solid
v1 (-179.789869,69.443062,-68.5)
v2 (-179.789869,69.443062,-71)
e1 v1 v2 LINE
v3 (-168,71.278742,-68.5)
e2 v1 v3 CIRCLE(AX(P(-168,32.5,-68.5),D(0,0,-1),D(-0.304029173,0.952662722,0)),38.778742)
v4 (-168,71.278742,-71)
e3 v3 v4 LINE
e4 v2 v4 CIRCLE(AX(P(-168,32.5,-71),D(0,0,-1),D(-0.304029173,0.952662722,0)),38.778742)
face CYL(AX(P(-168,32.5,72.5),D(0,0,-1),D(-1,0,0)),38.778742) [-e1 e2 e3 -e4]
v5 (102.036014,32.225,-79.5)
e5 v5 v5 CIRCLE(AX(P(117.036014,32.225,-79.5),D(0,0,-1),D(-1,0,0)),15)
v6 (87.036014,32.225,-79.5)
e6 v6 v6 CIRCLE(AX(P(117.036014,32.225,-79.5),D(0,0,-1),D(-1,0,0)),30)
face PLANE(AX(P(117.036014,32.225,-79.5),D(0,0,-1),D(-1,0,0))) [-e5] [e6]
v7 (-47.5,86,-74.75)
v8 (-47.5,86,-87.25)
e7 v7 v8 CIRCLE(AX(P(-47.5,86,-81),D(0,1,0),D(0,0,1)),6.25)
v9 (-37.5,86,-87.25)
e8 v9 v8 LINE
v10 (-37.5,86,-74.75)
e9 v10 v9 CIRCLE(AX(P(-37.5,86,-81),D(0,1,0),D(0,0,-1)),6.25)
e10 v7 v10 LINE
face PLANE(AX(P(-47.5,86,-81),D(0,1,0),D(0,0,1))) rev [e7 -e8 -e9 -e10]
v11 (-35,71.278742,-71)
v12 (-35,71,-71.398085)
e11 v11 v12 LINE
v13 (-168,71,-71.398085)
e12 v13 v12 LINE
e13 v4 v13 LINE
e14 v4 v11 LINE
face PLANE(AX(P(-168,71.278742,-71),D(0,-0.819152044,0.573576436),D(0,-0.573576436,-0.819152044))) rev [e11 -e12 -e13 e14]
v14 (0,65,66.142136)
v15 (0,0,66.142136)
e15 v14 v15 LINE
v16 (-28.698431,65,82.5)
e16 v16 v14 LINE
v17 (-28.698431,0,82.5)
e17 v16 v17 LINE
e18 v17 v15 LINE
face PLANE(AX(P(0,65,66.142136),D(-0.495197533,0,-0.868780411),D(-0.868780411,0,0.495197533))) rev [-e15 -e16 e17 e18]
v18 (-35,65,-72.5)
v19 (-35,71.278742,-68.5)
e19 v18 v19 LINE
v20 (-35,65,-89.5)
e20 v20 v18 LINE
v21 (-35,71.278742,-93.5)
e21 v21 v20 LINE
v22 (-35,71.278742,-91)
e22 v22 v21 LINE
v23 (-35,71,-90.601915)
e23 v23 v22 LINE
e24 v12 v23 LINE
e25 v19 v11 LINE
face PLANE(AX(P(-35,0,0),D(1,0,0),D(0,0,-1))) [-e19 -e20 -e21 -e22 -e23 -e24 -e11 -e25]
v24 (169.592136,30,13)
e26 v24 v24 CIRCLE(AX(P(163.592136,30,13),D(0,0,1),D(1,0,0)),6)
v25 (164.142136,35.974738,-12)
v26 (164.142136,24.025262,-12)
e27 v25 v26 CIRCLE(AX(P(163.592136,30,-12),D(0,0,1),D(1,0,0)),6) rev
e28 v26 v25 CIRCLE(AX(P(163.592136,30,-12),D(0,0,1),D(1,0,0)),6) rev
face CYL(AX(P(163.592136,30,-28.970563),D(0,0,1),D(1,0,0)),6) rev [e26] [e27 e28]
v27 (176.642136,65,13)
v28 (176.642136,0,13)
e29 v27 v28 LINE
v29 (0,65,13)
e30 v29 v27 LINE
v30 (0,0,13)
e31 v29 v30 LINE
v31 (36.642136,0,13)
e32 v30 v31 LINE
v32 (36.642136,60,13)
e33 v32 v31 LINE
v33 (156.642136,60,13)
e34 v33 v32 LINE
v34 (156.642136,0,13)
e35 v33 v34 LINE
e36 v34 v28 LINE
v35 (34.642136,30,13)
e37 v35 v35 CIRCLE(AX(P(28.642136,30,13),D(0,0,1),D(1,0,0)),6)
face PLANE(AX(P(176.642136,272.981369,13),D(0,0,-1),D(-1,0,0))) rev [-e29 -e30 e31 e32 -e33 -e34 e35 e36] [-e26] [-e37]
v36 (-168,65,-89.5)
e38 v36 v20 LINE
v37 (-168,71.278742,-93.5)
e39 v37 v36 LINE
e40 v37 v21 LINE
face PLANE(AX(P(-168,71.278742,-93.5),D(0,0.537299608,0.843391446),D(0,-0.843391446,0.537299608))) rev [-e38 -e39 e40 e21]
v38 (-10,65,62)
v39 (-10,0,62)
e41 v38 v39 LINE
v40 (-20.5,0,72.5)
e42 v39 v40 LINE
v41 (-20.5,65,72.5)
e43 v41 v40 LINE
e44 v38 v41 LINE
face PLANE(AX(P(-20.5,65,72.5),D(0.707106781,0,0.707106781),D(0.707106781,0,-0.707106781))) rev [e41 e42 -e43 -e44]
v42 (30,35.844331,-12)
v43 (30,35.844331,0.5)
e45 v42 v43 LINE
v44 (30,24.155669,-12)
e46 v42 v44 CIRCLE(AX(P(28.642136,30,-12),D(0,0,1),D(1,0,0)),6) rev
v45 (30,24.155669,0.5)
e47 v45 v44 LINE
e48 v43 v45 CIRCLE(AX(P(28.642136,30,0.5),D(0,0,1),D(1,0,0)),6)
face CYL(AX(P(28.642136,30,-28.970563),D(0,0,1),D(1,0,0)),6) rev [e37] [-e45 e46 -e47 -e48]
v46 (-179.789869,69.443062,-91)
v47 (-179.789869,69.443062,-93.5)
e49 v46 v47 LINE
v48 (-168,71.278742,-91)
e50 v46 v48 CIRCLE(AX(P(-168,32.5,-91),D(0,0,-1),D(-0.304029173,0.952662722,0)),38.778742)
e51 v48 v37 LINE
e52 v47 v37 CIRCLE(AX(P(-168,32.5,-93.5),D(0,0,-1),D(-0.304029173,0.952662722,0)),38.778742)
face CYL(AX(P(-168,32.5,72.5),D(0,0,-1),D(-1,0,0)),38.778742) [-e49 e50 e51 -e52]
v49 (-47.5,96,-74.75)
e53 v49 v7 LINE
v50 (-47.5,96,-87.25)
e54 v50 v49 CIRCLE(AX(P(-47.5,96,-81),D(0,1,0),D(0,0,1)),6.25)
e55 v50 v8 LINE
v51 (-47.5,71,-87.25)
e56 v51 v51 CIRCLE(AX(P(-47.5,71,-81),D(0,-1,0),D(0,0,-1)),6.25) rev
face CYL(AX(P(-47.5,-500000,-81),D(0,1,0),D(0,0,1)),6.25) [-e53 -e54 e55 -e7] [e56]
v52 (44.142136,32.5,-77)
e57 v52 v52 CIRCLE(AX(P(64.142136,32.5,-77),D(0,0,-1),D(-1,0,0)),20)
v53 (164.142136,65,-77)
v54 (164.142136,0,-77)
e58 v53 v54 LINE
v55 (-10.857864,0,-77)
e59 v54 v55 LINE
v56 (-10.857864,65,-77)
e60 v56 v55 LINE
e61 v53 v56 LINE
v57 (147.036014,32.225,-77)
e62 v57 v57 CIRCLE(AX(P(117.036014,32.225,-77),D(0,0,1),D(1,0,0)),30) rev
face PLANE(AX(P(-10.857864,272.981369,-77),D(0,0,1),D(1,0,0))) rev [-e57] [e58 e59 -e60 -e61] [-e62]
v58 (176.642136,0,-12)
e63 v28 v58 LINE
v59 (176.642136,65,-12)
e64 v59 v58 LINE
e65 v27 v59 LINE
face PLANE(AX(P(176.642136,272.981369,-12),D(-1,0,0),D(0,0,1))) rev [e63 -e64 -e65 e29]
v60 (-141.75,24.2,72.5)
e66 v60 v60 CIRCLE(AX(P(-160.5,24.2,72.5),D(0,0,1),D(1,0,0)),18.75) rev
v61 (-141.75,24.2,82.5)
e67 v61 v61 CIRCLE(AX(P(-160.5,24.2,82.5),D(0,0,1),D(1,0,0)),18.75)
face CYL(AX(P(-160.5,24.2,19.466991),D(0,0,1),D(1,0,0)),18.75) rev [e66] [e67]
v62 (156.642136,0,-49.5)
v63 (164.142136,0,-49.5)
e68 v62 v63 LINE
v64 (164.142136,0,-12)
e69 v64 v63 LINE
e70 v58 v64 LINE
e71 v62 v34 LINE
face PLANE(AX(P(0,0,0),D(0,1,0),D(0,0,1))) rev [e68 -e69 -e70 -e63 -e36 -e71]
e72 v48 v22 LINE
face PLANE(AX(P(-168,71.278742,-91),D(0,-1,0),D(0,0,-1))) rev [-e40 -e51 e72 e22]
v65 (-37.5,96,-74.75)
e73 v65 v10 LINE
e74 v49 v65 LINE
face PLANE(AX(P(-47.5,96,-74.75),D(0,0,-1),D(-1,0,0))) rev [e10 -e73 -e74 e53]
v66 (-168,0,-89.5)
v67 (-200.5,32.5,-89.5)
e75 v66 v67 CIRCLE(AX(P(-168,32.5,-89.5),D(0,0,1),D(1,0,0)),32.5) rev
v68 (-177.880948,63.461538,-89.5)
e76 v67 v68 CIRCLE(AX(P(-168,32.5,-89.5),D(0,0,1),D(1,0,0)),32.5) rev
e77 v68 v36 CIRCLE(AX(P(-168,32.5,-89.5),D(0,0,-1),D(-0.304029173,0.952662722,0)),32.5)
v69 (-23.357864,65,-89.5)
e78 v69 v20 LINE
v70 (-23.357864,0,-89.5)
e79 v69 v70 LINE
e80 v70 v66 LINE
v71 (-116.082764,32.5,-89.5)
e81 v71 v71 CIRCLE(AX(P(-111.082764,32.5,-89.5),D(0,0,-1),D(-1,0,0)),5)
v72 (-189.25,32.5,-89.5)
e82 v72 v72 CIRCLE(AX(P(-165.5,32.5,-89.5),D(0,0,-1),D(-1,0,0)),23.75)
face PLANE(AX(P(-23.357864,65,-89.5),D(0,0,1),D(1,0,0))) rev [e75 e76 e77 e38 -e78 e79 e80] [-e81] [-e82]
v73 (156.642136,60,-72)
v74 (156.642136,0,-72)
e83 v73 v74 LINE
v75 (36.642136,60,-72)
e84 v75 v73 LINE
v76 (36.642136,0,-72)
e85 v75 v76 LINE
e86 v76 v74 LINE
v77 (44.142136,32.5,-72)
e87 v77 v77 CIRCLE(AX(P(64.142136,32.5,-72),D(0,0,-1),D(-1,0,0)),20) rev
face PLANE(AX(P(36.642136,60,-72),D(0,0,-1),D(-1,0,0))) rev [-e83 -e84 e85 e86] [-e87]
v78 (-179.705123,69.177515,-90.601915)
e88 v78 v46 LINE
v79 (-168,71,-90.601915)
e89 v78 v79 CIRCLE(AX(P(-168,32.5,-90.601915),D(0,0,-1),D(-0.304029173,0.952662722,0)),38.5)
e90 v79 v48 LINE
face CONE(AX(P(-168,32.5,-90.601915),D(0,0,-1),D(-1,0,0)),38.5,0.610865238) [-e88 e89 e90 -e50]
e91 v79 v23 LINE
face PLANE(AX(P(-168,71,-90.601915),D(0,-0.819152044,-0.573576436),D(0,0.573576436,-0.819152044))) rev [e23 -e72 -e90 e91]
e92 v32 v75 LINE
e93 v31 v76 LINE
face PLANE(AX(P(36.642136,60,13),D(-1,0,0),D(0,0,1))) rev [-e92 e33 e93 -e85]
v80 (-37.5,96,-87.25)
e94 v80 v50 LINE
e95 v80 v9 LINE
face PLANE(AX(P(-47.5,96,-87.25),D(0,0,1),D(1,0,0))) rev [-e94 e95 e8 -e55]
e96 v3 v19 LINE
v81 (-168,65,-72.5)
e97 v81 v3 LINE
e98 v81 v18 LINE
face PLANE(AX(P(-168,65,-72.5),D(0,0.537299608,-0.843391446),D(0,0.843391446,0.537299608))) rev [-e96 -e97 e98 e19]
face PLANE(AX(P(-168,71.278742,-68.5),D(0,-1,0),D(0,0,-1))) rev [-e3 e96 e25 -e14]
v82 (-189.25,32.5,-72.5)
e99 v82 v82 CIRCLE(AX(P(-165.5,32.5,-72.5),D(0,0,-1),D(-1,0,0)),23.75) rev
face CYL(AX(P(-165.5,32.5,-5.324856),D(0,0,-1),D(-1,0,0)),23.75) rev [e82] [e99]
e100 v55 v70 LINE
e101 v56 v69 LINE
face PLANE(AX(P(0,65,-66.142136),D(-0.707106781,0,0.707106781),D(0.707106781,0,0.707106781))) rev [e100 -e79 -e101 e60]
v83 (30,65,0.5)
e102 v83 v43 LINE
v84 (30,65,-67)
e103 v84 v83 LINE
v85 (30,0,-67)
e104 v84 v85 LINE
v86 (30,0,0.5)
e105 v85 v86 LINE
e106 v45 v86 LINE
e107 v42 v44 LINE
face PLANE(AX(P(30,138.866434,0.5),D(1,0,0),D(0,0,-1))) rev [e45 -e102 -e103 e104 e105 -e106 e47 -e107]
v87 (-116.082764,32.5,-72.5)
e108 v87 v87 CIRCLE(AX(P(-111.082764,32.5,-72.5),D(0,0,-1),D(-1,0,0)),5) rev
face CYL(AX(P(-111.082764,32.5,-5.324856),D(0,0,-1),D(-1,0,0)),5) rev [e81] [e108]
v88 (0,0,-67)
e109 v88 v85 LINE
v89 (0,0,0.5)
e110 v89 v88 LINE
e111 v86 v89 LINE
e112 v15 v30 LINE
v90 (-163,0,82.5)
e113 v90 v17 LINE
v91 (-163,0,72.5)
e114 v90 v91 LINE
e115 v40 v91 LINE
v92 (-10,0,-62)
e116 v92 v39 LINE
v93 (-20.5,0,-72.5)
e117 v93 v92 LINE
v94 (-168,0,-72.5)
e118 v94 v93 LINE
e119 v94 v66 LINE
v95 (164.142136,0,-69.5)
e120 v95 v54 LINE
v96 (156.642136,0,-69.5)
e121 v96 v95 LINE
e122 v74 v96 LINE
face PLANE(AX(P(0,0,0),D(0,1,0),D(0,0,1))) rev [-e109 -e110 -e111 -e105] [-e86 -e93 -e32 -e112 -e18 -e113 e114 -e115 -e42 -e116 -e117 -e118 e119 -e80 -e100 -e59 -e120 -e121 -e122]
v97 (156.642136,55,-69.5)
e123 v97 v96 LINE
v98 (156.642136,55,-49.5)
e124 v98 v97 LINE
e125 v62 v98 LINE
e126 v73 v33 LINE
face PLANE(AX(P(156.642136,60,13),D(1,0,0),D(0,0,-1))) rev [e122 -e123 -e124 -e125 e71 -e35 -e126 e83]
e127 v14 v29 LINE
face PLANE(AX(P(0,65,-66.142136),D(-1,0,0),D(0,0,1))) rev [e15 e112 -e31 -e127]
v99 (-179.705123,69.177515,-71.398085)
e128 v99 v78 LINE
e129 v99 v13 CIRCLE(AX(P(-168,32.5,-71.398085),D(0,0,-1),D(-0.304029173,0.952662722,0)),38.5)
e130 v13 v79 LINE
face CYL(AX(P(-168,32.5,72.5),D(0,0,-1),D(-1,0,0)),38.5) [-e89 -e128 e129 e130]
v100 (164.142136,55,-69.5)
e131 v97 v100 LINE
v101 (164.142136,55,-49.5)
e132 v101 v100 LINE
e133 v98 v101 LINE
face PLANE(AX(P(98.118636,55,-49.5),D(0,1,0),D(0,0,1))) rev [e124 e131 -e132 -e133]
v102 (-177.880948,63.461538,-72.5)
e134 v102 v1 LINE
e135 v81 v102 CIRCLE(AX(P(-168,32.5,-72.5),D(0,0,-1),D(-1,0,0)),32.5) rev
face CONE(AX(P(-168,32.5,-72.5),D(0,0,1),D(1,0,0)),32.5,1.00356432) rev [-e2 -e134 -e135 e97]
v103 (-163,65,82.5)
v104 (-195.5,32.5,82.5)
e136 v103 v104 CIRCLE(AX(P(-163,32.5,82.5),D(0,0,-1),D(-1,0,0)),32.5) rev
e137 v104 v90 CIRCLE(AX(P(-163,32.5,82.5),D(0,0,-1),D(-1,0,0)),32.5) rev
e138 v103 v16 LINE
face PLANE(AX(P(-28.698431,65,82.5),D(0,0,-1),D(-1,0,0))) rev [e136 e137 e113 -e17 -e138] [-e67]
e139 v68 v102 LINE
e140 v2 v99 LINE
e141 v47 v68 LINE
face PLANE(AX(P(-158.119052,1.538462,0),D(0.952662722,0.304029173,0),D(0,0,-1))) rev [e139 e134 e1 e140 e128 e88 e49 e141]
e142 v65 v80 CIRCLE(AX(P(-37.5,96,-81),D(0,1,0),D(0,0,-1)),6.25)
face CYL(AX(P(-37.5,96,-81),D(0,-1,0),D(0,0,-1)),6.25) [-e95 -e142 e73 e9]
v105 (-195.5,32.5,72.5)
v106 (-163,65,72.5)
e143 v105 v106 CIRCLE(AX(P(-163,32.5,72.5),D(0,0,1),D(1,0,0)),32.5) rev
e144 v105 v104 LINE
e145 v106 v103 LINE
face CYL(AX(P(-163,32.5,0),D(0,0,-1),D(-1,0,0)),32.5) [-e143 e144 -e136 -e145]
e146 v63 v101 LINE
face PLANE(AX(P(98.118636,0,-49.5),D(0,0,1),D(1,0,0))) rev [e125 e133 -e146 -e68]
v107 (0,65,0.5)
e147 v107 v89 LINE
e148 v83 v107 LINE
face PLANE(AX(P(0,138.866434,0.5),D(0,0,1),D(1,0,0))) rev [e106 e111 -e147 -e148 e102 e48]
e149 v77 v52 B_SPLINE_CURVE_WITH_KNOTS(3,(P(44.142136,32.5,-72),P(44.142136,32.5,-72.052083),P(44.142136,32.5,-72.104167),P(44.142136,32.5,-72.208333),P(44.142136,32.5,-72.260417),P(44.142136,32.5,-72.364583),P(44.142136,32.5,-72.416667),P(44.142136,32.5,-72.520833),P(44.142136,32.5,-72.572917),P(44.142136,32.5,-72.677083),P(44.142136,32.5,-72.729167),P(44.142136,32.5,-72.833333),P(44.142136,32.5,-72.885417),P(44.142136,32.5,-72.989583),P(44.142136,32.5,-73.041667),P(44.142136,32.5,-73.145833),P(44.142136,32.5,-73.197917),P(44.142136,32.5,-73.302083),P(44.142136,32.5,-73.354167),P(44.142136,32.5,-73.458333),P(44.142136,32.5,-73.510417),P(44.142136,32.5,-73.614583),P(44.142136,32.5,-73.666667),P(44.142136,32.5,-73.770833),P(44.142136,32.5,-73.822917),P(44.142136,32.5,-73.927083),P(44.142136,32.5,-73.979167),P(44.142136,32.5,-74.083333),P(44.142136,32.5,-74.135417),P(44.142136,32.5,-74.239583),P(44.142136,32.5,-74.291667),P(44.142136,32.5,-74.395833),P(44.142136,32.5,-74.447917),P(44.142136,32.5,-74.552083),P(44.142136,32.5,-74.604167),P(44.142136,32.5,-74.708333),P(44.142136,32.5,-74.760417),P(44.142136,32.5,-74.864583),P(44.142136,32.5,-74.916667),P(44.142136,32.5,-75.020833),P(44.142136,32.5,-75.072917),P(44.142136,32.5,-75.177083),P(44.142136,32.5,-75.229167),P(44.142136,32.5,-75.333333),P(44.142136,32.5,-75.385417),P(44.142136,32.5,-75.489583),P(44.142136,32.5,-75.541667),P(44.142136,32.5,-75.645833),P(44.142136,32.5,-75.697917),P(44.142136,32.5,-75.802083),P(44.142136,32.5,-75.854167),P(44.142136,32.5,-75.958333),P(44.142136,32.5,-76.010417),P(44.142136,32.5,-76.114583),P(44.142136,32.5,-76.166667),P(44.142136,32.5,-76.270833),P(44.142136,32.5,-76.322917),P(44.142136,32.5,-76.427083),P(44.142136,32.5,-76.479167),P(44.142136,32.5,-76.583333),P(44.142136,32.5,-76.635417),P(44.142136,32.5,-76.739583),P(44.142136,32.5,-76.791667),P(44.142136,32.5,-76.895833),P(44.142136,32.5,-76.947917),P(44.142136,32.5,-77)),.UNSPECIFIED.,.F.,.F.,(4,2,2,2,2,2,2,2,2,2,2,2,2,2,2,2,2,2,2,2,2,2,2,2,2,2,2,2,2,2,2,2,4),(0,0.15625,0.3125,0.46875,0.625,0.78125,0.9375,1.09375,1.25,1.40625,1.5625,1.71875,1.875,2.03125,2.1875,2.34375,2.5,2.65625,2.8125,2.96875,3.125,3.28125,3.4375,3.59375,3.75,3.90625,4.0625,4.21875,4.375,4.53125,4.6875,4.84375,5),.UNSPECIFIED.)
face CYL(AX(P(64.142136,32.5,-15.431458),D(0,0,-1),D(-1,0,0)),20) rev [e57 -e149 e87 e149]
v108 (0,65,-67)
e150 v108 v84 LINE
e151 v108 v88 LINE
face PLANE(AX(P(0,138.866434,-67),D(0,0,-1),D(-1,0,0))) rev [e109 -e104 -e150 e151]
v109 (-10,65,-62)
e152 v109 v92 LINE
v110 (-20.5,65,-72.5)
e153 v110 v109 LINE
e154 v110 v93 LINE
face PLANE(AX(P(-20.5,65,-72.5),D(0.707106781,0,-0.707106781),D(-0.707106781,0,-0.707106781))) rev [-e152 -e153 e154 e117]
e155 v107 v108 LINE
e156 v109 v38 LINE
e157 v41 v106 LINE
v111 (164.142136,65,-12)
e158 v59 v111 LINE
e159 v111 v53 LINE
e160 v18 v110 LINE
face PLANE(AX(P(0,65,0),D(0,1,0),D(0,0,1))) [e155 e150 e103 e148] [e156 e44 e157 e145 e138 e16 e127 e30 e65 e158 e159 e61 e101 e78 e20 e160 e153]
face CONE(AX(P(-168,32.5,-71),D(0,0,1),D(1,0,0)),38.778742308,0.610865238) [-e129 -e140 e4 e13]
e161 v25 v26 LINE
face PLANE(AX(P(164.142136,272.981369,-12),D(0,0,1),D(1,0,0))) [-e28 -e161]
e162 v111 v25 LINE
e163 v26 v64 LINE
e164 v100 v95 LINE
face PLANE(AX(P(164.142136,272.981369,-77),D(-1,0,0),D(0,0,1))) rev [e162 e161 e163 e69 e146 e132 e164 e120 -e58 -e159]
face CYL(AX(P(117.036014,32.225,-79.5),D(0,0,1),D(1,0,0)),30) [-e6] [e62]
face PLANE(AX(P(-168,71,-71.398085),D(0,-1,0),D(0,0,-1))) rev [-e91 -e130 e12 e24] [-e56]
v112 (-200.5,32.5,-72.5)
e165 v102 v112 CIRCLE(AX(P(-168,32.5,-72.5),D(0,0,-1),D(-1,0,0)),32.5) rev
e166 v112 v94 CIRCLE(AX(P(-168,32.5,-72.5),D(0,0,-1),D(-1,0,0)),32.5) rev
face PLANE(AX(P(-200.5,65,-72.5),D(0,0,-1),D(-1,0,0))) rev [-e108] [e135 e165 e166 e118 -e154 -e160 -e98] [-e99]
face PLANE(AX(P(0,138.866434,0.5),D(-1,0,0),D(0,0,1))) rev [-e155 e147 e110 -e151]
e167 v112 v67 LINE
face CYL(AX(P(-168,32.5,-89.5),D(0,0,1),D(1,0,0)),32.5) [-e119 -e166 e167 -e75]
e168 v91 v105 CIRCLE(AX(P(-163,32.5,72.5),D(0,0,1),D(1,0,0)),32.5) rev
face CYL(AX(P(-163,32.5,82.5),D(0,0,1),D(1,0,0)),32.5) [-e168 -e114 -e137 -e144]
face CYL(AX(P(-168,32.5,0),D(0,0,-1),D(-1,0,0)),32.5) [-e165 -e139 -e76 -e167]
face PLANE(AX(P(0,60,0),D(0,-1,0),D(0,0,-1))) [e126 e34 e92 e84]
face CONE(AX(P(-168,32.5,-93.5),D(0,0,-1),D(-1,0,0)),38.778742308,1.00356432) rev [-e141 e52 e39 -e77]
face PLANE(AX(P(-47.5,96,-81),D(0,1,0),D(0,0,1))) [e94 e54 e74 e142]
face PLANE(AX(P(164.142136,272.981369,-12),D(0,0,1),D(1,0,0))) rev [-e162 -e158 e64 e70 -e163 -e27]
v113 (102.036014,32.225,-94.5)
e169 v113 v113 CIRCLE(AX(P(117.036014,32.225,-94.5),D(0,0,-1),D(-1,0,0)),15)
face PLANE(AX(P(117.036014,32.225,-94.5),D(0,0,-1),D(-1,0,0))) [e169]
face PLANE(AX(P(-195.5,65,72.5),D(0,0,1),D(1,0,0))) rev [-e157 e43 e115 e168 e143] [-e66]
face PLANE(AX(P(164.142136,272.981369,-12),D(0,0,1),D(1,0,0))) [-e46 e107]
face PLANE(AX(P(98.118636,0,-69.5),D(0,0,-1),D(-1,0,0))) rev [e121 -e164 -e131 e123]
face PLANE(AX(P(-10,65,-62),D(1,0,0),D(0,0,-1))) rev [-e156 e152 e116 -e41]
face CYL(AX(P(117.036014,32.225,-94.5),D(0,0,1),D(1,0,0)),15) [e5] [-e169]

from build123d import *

# Parameters (mm, degrees)
BOSS_EXTRUDE1_DEPTH = 65
BOSS_EXTRUDE2_DEPTH = 65
SKETCH5_W           = 30
SKETCH5_H           = 67.5
CUT_EXTRUDE1_DEPTH  = 65
SKETCH7_W           = 120
SKETCH7_H           = 85
CUT_EXTRUDE2_DEPTH  = 60
CUT_EXTRUDE3_REACH  = 236.375
SKETCH8_R           = 6
FILLET1_R           = 32.5
SKETCH9_R           = 18.75
CUT_EXTRUDE4_DEPTH  = 10
CUT_EXTRUDE5_START  = -17
SKETCH10_R          = 23.75
SKETCH10_R_2        = 5
CUT_EXTRUDE5_DEPTH  = 17
SKETCH11_W          = 20
SKETCH11_H          = 55
CUT_EXTRUDE6_DEPTH  = 20
SKETCH12_R          = 20
CUT_EXTRUDE7_DEPTH  = 5
SKETCH13_R          = 30
BOSS_EXTRUDE3_DEPTH = 2.5
SKETCH14_R          = 15
BOSS_EXTRUDE4_DEPTH = 15
SKETCH17_R          = 6.25
BOSS_EXTRUDE5_DEPTH = 15
BOSS_EXTRUDE6_DEPTH = 10


with BuildPart() as part:
    # Sketch2 → Boss-Extrude1 (new body)
    with BuildSketch(Plane(origin=(0, 0, 0), x_dir=(1, 0, 0), z_dir=(0, 1, 0))):
        Polygon((0, 66.142135624), (0, -66.142135624), (-28.698430784, -82.5), (-195.5, -82.5), (-195.5, -72.5), (-20.5, -72.5), (-10, -62), (-10, 62), (-20.5, 72.5), (-200.5, 72.5), (-200.5, 89.5), (-23.357864376, 89.5), align=None)
    extrude(amount=BOSS_EXTRUDE1_DEPTH)

    # Sketch3 → Boss-Extrude2 (add)
    with BuildSketch(Plane(origin=(0, 0, 0), x_dir=(1, 0, 0), z_dir=(0, 1, 0))):
        Polygon((164.142135624, 77), (164.142135624, 12), (176.642135624, 12), (176.642135624, -13), (0, -13), (0, 66.142135624), (-10.857864376, 77), align=None)
    extrude(amount=BOSS_EXTRUDE2_DEPTH)

    # Sketch5 → Cut-Extrude1 (cut)
    with BuildSketch(Plane(origin=(0, 0, 0), x_dir=(-1, 0, 0), z_dir=(0, -1, 0))):
        with Locations((-15, 33.25)):
            Rectangle(SKETCH5_W, SKETCH5_H)
    extrude(amount=-CUT_EXTRUDE1_DEPTH, mode=Mode.SUBTRACT)

    # Sketch7 → Cut-Extrude2 (cut)
    with BuildSketch(Plane(origin=(0, 0, 0), x_dir=(-1, 0, 0), z_dir=(0, -1, 0))):
        with Locations((-96.642135624, 29.5)):
            Rectangle(SKETCH7_W, SKETCH7_H)
    extrude(amount=-CUT_EXTRUDE2_DEPTH, mode=Mode.SUBTRACT)

    # Cut-Extrude3: up to this face of the body (flat: up to its plane)
    cut_extrude3_end = Plane(part.part.faces().sort_by_distance((170.392135624, 32.5, -12))[0])
    # Sketch8 → Cut-Extrude3 (cut, up to the picked face)
    with BuildSketch(Plane.XY.offset(13), mode=Mode.PRIVATE) as cut_extrude3_sk1:
        with Locations((28.642135624, 30)):
            Circle(SKETCH8_R)
    cut_extrude3_tool1 = split(extrude(cut_extrude3_sk1.sketch, amount=-CUT_EXTRUDE3_REACH, mode=Mode.PRIVATE), bisect_by=cut_extrude3_end, keep=Keep.BOTH, mode=Mode.PRIVATE)
    # Sketch8 → Cut-Extrude3 (cut, up to the picked face)
    with BuildSketch(Plane.XY.offset(13), mode=Mode.PRIVATE) as cut_extrude3_sk2:
        with Locations((163.592135624, 30)):
            Circle(SKETCH8_R)
    cut_extrude3_tool2 = split(extrude(cut_extrude3_sk2.sketch, amount=-CUT_EXTRUDE3_REACH, mode=Mode.PRIVATE), bisect_by=cut_extrude3_end, keep=Keep.BOTH, mode=Mode.PRIVATE)
    add(cut_extrude3_tool1.solids().sort_by(Axis((28.642136, 30, 13), (0, 0, -1)))[0], mode=Mode.SUBTRACT)
    add(cut_extrude3_tool2.solids().sort_by(Axis((163.592136, 30, 13), (0, 0, -1)))[0], mode=Mode.SUBTRACT)

    # Fillet1
    fillet1_edges = [part.edges().sort_by_distance(p)[0] for p in [
        (-195.5, 65, 77.5),
        (-195.5, 0, 77.5),
        (-200.5, 0, -81),
        (-200.5, 65, -81),
    ]]
    fillet(fillet1_edges, radius=FILLET1_R - 0.0001)  # a hair under: the kernel refuses the full size

    # Sketch9 → Cut-Extrude4 (cut)
    with BuildSketch(Plane.XY.offset(82.5)):
        with Locations((-160.5, 24.2)):
            Circle(SKETCH9_R)
    extrude(amount=-CUT_EXTRUDE4_DEPTH, mode=Mode.SUBTRACT)

    # Sketch10 → Cut-Extrude5 (cut)
    with BuildSketch(Plane(origin=(0, 0, -89.5), x_dir=(-1, 0, 0), z_dir=(0, 0, -1)).offset(CUT_EXTRUDE5_START)):
        with Locations((165.5, 32.5)):
            Circle(SKETCH10_R)
        with Locations((111.08276356, 32.5)):
            Circle(SKETCH10_R_2)
    extrude(amount=CUT_EXTRUDE5_DEPTH, mode=Mode.SUBTRACT)

    # Sketch11 → Cut-Extrude6 (cut)
    with BuildSketch(Plane(origin=(176.642135624, 0, 0), x_dir=(0, 0, -1), z_dir=(1, 0, 0))):
        with Locations((59.5, 27.5)):
            Rectangle(SKETCH11_W, SKETCH11_H)
    extrude(amount=-CUT_EXTRUDE6_DEPTH, mode=Mode.SUBTRACT)

    # Sketch12 → Cut-Extrude7 (cut)
    with BuildSketch(Plane(origin=(0, 0, -77), x_dir=(-1, 0, 0), z_dir=(0, 0, -1))):
        with Locations((-64.142135624, 32.5)):
            Circle(SKETCH12_R)
    extrude(amount=-CUT_EXTRUDE7_DEPTH, mode=Mode.SUBTRACT)

    # Sketch13 → Boss-Extrude3 (add)
    with BuildSketch(Plane(origin=(0, 0, -77), x_dir=(-1, 0, 0), z_dir=(0, 0, -1))):
        with Locations(Location((-117.036013704, 32.225, 0), (0, 0, 180))):
            Circle(SKETCH13_R)
    extrude(amount=BOSS_EXTRUDE3_DEPTH)

    # Sketch14 → Boss-Extrude4 (add)
    with BuildSketch(Plane(origin=(0, 0, -79.5), x_dir=(-1, 0, 0), z_dir=(0, 0, -1))):
        with Locations((-117.036013704, 32.225)):
            Circle(SKETCH14_R)
    extrude(amount=BOSS_EXTRUDE4_DEPTH)

    # Sweep1: sweep along a path in Sketch16
    with BuildLine(Plane(origin=(0, 0, 72.5), x_dir=(-1, 0, 0), z_dir=(0, 0, -1))) as sweep1_path:
        Line((35, 65), (168, 65))
        ThreePointArc((168, 65), (173, 64.613081447), (177.880948137, 63.461538462))
    # Sketch15 → Sweep1 (sweep)
    with BuildSketch(Plane.ZY.offset(35)):
        Polygon((-89.5, 65), (-72.5, 65), (-68.5, 71.278742308), (-71, 71.278742308), (-71.398085272, 71), (-90.601914728, 71), (-91, 71.278742308), (-93.5, 71.278742308), align=None)
    sweep(path=sweep1_path.line)

    # Sketch17 → Boss-Extrude5 (add)
    with BuildSketch(Plane(origin=(0, 71, 0), x_dir=(1, 0, 0), z_dir=(0, 1, 0))):
        with Locations(Location((-47.5, 81, 0), (0, 0, 270))):
            Circle(SKETCH17_R)
    extrude(amount=BOSS_EXTRUDE5_DEPTH)

    # Sketch18 → Boss-Extrude6 (add)
    with BuildSketch(Plane(origin=(0, 86, 0), x_dir=(1, 0, 0), z_dir=(0, 1, 0))):
        with BuildLine():
            Line((-47.5, 87.25), (-37.5, 87.25))
            ThreePointArc((-37.5, 87.25), (-31.25, 81), (-37.5, 74.75))
            Line((-37.5, 74.75), (-47.5, 74.75))
            ThreePointArc((-47.5, 74.75), (-53.75, 81), (-47.5, 87.25))
        make_face()
    extrude(amount=BOSS_EXTRUDE6_DEPTH)


solid = part.part
